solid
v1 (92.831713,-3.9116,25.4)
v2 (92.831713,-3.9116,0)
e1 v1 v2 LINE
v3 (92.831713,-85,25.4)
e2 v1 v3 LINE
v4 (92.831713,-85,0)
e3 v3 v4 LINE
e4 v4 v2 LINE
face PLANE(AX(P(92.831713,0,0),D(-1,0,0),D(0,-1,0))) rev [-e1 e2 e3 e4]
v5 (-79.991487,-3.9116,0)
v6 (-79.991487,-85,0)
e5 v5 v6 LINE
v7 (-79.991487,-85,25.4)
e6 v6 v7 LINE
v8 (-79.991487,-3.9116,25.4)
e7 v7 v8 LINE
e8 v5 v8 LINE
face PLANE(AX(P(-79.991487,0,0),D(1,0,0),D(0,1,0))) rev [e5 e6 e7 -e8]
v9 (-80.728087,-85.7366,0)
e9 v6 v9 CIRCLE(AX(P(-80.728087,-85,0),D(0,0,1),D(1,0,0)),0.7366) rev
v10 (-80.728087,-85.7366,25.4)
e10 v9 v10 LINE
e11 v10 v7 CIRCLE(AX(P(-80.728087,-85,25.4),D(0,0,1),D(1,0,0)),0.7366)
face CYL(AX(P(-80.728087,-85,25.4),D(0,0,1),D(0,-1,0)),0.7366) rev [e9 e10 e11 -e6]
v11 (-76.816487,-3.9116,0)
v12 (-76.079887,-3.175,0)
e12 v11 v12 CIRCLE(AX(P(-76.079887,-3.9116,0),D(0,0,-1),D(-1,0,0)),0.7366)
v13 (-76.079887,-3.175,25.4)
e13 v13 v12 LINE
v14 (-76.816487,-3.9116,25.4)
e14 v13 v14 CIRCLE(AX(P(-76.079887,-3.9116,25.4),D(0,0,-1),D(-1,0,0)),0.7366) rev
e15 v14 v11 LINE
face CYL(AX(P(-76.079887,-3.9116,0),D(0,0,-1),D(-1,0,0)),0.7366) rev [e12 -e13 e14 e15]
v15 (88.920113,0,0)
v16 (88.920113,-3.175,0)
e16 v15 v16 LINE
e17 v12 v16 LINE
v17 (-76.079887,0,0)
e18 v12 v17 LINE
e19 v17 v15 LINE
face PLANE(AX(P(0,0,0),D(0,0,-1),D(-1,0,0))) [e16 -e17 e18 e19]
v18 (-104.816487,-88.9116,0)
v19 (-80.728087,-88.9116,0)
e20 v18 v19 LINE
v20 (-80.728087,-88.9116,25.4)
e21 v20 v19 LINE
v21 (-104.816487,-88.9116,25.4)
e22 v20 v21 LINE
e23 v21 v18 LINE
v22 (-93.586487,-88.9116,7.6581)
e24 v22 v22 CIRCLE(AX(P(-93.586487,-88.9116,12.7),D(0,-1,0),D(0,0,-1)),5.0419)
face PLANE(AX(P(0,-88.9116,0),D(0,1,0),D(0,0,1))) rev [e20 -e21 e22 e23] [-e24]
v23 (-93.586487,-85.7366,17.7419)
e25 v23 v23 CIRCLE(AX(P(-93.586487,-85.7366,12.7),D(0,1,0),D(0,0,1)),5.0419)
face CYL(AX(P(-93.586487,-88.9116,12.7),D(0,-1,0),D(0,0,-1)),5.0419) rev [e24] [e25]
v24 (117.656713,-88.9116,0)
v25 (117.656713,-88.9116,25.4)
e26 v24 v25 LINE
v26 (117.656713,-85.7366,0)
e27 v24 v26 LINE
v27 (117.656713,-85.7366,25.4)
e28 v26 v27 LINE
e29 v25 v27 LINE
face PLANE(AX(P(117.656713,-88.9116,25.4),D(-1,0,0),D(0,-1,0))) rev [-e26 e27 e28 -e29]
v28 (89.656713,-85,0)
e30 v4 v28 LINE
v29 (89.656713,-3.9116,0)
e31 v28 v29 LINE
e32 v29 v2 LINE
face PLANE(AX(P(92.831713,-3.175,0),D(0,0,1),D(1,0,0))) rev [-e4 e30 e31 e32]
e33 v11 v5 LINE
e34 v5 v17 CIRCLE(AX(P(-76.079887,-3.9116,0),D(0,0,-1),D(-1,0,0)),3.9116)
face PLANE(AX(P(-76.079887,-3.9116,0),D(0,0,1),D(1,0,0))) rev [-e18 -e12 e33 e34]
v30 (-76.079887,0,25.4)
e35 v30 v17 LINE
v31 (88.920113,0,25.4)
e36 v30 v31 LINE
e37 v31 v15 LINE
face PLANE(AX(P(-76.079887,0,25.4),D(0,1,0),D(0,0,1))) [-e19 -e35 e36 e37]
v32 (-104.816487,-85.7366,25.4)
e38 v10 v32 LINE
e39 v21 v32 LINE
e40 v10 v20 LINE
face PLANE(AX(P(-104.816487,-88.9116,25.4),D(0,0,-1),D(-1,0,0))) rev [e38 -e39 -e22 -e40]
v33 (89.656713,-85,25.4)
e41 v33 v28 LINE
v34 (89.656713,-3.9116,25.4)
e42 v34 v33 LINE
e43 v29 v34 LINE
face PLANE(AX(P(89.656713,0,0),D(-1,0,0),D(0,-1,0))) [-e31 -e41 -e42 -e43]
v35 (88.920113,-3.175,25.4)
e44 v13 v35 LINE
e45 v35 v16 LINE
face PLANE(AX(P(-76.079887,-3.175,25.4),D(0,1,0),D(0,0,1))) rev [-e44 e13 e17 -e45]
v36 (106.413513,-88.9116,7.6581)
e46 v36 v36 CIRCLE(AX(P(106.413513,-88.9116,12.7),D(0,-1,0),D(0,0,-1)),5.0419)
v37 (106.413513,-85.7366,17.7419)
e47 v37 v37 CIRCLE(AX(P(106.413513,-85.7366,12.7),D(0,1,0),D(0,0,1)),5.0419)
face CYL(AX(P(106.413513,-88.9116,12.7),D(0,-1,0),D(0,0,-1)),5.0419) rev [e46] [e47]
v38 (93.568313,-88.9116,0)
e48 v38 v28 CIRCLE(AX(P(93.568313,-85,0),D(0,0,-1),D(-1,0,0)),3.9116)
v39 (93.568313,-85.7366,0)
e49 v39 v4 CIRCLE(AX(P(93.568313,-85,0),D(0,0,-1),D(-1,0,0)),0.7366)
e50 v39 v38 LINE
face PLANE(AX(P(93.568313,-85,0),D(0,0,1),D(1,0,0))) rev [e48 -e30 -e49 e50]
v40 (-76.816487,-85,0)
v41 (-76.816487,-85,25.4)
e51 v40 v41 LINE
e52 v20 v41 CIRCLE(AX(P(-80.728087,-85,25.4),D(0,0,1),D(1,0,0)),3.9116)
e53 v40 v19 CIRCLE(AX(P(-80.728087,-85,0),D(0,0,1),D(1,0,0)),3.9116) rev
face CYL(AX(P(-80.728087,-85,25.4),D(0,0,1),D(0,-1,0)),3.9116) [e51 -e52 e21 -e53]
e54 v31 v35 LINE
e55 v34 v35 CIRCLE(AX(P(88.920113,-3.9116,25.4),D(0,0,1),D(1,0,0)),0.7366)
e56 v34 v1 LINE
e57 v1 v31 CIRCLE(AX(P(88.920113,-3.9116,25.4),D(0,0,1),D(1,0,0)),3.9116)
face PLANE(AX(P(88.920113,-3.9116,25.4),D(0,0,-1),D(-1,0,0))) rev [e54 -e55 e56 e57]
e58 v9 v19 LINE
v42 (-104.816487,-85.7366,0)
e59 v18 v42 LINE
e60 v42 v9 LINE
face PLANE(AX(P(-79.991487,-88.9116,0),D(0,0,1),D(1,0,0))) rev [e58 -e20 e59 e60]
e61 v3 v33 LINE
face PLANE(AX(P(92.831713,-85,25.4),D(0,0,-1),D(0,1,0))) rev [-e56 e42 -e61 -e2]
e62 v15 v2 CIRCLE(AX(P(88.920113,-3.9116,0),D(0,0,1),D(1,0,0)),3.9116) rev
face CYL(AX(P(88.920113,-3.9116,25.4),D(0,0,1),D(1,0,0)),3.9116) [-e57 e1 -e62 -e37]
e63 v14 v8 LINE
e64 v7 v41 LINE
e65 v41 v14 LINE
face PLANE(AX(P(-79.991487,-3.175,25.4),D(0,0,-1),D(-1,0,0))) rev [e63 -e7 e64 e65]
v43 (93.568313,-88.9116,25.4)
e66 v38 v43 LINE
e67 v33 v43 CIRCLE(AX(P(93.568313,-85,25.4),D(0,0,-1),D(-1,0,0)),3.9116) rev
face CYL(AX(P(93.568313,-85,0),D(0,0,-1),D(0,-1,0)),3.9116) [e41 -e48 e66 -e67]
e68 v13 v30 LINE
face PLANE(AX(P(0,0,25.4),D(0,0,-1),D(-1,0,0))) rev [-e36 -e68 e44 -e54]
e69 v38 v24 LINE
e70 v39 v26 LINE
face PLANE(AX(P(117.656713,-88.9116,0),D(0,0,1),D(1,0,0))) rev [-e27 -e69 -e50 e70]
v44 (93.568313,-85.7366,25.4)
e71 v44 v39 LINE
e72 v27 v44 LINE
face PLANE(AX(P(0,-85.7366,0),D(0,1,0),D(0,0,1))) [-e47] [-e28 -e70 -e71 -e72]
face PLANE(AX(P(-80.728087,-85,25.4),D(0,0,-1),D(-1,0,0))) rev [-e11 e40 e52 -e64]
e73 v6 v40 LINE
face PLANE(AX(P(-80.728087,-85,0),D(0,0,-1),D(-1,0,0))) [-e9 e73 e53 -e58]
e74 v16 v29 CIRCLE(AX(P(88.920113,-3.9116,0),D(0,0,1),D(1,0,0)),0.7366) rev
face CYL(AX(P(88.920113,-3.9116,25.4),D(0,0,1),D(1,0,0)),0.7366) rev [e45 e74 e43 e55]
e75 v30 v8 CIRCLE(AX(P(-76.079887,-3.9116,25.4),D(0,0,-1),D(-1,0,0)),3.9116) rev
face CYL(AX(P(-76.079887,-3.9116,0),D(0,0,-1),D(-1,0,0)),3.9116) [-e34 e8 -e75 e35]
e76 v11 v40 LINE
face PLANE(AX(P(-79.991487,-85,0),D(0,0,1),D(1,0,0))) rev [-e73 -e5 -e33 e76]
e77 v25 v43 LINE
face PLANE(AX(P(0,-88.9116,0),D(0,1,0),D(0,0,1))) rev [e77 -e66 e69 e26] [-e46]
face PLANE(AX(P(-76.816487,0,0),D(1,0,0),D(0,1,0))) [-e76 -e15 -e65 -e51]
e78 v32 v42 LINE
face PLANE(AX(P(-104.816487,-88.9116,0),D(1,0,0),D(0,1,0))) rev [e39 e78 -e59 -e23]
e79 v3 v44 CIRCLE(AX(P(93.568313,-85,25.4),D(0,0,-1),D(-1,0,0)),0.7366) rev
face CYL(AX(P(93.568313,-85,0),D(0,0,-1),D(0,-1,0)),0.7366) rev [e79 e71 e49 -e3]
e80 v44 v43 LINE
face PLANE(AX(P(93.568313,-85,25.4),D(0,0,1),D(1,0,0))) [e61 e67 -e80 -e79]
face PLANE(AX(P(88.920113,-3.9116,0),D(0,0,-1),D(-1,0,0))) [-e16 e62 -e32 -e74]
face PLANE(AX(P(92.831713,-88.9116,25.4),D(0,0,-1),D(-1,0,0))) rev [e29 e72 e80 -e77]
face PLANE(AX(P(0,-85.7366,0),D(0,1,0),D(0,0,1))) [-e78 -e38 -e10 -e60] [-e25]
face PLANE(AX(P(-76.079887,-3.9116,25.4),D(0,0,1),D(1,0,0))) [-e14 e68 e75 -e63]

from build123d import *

# Parameters (mm, degrees)
CROQUIS1_W                    = 165
CROQUIS1_H                    = 3.175
BRIDA_BASE1_DEPTH             = 25.4
BRIDA_DE_ARISTA1_DEPTH        = 25.4
BRIDA_DE_ARISTA1_BEND_DEPTH   = 25.4
BRIDA_DE_ARISTA2_DEPTH        = 25.4
BRIDA_DE_ARISTA2_BEND_DEPTH   = 25.4
TALADRO_DE_MARGEN_PARA_3_81_D = 10.0838


# Sheet-metal steps are written as plain solids
with BuildPart() as part:
    # Croquis1 → Brida base1 (new body)
    with BuildSketch(Plane.XY):
        with Locations((6.420112782, -1.5875)):
            Rectangle(CROQUIS1_W, CROQUIS1_H)
    extrude(amount=BRIDA_BASE1_DEPTH)

    # Brida de arista1 section (across the edge) → Brida de arista1 (add)
    with BuildSketch(Plane(origin=(89.656712782, -3.175, 0), x_dir=(-1, 0, 0), z_dir=(0, 0, 1))):
        with BuildLine():
            Line((-3.175, 0.7366), (-3.175, 81.825))
            Line((-3.175, 81.825), (0, 81.825))
            Line((0, 81.825), (0, 0.7366))
            ThreePointArc((0, 0.7366), (0.215745145, 0.215745145), (0.7366, 0))
            Line((0.7366, 0), (0.7366, -3.175))
            ThreePointArc((0.7366, -3.175), (-2.029318885, -2.029318885), (-3.175, 0.7366))
        make_face()
    extrude(amount=BRIDA_DE_ARISTA1_DEPTH)

    # Brida de arista1 section 2 (across the edge) → Brida de arista1 bend (add)
    with BuildSketch(Plane(origin=(-76.816487218, -3.175, 25.4), x_dir=(1, 0, 0), z_dir=(0, 0, -1))):
        with BuildLine():
            Line((-3.175, 0.7366), (-3.175, 81.825))
            Line((-3.175, 81.825), (0, 81.825))
            Line((0, 81.825), (0, 0.7366))
            ThreePointArc((0, 0.7366), (0.215745145, 0.215745145), (0.7366, 0))
            Line((0.7366, 0), (0.7366, -3.175))
            ThreePointArc((0.7366, -3.175), (-2.029318885, -2.029318885), (-3.175, 0.7366))
        make_face()
    extrude(amount=BRIDA_DE_ARISTA1_BEND_DEPTH)

    # Brida de arista2 section (across the edge) → Brida de arista2 (add)
    with BuildSketch(Plane(origin=(92.831712782, -85.7366, 25.4), x_dir=(0, 1, 0), z_dir=(0, 0, -1))):
        with BuildLine():
            Line((-3.175, 0.7366), (-3.175, 24.825))
            Line((-3.175, 24.825), (0, 24.825))
            Line((0, 24.825), (0, 0.7366))
            ThreePointArc((0, 0.7366), (0.215745145, 0.215745145), (0.7366, 0))
            Line((0.7366, 0), (0.7366, -3.175))
            ThreePointArc((0.7366, -3.175), (-2.029318885, -2.029318885), (-3.175, 0.7366))
        make_face()
    extrude(amount=BRIDA_DE_ARISTA2_DEPTH)

    # Brida de arista2 section 2 (across the edge) → Brida de arista2 bend (add)
    with BuildSketch(Plane(origin=(-79.991487218, -85.7366, 0), x_dir=(0, 1, 0), z_dir=(0, 0, 1))):
        with BuildLine():
            Line((-3.175, 0.7366), (-3.175, 24.825))
            Line((-3.175, 24.825), (0, 24.825))
            Line((0, 24.825), (0, 0.7366))
            ThreePointArc((0, 0.7366), (0.215745145, 0.215745145), (0.7366, 0))
            Line((0.7366, 0), (0.7366, -3.175))
            ThreePointArc((0.7366, -3.175), (-2.029318885, -2.029318885), (-3.175, 0.7366))
        make_face()
    extrude(amount=BRIDA_DE_ARISTA2_BEND_DEPTH)

    # Taladro de margen para 3/81 (through all)
    with Locations(Plane(origin=(0, -88.9116, 0), x_dir=(-1, 0, 0), z_dir=(0, -1, 0))):
        with Locations((93.586487218, -12.7), (-106.413512782, -12.7)):
            Hole(TALADRO_DE_MARGEN_PARA_3_81_D / 2)


solid = part.part
